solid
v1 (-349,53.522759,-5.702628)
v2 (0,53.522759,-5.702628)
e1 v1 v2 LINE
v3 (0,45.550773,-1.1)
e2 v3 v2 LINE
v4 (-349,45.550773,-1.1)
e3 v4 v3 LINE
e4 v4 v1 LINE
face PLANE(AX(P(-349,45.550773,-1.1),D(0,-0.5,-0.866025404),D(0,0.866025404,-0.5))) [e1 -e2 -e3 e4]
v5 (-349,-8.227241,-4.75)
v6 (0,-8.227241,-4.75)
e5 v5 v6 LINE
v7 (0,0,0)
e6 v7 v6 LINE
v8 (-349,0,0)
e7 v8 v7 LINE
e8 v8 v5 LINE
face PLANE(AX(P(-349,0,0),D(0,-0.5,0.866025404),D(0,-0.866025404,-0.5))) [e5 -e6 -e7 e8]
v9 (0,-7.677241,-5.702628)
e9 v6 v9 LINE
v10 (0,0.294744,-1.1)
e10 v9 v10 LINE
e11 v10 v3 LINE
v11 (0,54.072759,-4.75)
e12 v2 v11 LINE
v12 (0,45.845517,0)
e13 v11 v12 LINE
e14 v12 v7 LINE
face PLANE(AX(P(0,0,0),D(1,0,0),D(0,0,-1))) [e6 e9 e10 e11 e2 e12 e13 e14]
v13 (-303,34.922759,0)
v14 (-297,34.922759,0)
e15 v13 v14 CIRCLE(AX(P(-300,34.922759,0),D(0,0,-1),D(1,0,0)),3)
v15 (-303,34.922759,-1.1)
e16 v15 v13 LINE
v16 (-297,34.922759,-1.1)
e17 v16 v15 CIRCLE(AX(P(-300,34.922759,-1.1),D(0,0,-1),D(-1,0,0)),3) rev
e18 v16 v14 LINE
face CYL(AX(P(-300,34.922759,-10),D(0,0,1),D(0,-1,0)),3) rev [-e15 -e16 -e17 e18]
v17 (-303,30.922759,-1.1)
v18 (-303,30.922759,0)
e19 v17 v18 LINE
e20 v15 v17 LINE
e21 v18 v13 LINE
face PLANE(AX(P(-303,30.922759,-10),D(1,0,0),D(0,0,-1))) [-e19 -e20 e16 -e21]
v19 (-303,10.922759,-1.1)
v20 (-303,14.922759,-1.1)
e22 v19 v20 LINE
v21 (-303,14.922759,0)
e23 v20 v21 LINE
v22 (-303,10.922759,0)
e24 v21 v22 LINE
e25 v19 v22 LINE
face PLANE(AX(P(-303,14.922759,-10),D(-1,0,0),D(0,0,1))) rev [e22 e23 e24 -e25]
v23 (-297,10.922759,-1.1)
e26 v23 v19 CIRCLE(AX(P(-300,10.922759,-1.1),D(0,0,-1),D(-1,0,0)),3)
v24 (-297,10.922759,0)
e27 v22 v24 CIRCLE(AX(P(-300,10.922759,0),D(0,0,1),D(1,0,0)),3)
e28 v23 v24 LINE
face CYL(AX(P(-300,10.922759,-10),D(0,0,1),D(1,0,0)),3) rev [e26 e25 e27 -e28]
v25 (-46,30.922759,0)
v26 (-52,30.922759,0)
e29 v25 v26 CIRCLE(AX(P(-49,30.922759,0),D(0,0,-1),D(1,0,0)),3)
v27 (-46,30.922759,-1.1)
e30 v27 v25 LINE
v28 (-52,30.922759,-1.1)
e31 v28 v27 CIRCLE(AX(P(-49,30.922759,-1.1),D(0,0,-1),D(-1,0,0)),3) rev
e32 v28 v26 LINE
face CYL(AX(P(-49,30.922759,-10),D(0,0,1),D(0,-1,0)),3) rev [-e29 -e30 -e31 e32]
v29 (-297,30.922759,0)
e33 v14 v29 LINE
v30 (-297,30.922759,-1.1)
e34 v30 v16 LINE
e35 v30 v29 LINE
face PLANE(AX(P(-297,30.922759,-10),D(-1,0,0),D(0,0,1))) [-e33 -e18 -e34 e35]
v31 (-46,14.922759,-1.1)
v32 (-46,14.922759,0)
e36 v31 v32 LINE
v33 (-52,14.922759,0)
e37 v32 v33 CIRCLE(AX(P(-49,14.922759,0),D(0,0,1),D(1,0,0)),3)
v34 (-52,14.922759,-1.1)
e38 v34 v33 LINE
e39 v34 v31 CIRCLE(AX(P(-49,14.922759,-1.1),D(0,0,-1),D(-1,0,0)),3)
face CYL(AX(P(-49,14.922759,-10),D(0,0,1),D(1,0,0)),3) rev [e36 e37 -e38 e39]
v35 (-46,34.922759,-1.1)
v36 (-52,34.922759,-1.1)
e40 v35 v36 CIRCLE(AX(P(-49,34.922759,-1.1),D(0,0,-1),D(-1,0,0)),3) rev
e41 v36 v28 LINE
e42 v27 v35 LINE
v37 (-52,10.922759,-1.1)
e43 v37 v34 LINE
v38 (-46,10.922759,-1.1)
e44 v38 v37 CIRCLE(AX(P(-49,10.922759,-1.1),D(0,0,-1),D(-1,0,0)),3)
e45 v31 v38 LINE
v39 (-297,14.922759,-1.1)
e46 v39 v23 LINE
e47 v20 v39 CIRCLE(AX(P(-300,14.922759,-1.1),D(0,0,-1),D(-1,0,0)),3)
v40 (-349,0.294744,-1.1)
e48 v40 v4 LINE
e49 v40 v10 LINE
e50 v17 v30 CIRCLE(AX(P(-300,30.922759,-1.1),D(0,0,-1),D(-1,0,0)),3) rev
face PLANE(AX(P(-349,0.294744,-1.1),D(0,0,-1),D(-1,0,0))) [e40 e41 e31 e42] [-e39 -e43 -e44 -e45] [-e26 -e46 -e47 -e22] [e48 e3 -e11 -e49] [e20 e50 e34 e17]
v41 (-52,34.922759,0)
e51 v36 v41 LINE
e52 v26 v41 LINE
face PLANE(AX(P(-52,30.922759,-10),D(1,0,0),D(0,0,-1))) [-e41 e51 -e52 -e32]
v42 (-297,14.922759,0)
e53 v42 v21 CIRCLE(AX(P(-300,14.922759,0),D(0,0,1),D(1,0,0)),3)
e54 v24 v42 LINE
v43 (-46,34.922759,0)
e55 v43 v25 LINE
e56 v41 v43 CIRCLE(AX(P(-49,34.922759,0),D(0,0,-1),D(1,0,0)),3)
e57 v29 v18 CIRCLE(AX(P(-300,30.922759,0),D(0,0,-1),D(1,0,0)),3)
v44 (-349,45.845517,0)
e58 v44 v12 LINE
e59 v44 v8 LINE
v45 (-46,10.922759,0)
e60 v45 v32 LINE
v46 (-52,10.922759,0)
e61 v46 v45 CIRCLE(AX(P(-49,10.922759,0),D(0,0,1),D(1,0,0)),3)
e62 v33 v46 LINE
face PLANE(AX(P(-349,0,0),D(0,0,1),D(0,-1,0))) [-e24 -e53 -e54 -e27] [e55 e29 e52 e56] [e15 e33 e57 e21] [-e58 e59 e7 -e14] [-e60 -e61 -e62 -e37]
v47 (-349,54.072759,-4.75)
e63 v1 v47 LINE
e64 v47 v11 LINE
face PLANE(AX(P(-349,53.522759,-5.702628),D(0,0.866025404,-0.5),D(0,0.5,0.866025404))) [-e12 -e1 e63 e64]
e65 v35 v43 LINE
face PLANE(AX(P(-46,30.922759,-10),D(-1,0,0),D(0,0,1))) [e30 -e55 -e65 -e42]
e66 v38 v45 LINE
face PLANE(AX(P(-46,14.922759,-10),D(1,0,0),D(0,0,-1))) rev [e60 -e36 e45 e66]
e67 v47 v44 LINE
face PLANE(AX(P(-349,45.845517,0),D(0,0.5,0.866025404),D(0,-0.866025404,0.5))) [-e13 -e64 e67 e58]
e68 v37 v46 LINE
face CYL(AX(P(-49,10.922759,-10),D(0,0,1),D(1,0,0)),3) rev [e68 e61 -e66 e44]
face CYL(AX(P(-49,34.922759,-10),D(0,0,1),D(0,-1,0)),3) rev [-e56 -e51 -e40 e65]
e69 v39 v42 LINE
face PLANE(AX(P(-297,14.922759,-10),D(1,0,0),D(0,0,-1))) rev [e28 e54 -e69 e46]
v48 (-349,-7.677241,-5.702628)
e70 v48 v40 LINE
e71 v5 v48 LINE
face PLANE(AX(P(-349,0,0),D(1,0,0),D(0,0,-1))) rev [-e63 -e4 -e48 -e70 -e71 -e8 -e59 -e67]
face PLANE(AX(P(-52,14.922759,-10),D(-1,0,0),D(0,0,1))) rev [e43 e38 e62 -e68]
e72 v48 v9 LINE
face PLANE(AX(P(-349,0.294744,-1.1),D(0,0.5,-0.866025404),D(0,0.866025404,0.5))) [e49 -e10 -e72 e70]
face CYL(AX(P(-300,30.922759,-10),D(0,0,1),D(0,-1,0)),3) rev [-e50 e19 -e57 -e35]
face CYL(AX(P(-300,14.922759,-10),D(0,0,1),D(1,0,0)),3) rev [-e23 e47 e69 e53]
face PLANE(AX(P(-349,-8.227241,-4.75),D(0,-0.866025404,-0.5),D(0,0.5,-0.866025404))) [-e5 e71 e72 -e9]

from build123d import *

# Parameters (mm, degrees)
SM_BASE_FLANGE_2_DEPTH        = 349
CUT_EXTRUDE_1_DEPTH           = 10
PATTERN_LINEAR_1_COUNT        = 2
PATTERN_LINEAR_1_PITCH        = 251
PATTERN_LINEAR_1_COPY_1_DEPTH = 10


# Sheet-metal steps are written as plain solids
with BuildPart() as part:
    # 草图2 → 基体-法兰2 (new body)
    with BuildSketch(Plane(origin=(0, 0, 0), x_dir=(0, 0, -1), z_dir=(1, 0, 0))):
        Polygon((0, 0), (0, 45.845517328), (4.75, 54.072758664), (5.702627944, 53.522758664), (1.1, 45.550773216), (1.1, 0.294744112), (5.702627944, -7.677241336), (4.75, -8.227241336), align=None)
    extrude(amount=-SM_BASE_FLANGE_2_DEPTH)

    # 草图11 → 切除-拉伸1 (cut)
    with BuildSketch(Plane.XY):
        with BuildLine():
            Line((-46, 14.922758664), (-46, 10.922758664))
            ThreePointArc((-46, 10.922758664), (-49, 7.922758664), (-52, 10.922758664))
            Line((-52, 10.922758664), (-52, 14.922758664))
            ThreePointArc((-52, 14.922758664), (-49, 17.922758664), (-46, 14.922758664))
        make_face()
    cut_extrude_1 = extrude(amount=-CUT_EXTRUDE_1_DEPTH, mode=Mode.SUBTRACT)

    # 镜向1: 切除-拉伸1 across plane
    add(cut_extrude_1.mirror(Plane.ZX.offset(22.922758664)), mode=Mode.SUBTRACT)

    # 阵列(线性)1: 切除-拉伸1 ×2
    with Locations(*[(-i * PATTERN_LINEAR_1_PITCH, 0, 0) for i in range(1, PATTERN_LINEAR_1_COUNT)]):
        add(cut_extrude_1, mode=Mode.SUBTRACT)

    # 阵列(线性)1 copy 1 sketch → 阵列(线性)1 copy 1 (cut)
    with BuildSketch(Plane(origin=(-251, 45.845517328, 0), x_dir=(1, 0, 0), z_dir=(0, 0, 1))):
        with BuildLine():
            Line((-46, -14.922758664), (-46, -10.922758664))
            ThreePointArc((-46, -10.922758664), (-49, -7.922758664), (-52, -10.922758664))
            Line((-52, -10.922758664), (-52, -14.922758664))
            ThreePointArc((-52, -14.922758664), (-49, -17.922758664), (-46, -14.922758664))
        make_face()
    extrude(amount=-PATTERN_LINEAR_1_COPY_1_DEPTH, mode=Mode.SUBTRACT)


solid = part.part
